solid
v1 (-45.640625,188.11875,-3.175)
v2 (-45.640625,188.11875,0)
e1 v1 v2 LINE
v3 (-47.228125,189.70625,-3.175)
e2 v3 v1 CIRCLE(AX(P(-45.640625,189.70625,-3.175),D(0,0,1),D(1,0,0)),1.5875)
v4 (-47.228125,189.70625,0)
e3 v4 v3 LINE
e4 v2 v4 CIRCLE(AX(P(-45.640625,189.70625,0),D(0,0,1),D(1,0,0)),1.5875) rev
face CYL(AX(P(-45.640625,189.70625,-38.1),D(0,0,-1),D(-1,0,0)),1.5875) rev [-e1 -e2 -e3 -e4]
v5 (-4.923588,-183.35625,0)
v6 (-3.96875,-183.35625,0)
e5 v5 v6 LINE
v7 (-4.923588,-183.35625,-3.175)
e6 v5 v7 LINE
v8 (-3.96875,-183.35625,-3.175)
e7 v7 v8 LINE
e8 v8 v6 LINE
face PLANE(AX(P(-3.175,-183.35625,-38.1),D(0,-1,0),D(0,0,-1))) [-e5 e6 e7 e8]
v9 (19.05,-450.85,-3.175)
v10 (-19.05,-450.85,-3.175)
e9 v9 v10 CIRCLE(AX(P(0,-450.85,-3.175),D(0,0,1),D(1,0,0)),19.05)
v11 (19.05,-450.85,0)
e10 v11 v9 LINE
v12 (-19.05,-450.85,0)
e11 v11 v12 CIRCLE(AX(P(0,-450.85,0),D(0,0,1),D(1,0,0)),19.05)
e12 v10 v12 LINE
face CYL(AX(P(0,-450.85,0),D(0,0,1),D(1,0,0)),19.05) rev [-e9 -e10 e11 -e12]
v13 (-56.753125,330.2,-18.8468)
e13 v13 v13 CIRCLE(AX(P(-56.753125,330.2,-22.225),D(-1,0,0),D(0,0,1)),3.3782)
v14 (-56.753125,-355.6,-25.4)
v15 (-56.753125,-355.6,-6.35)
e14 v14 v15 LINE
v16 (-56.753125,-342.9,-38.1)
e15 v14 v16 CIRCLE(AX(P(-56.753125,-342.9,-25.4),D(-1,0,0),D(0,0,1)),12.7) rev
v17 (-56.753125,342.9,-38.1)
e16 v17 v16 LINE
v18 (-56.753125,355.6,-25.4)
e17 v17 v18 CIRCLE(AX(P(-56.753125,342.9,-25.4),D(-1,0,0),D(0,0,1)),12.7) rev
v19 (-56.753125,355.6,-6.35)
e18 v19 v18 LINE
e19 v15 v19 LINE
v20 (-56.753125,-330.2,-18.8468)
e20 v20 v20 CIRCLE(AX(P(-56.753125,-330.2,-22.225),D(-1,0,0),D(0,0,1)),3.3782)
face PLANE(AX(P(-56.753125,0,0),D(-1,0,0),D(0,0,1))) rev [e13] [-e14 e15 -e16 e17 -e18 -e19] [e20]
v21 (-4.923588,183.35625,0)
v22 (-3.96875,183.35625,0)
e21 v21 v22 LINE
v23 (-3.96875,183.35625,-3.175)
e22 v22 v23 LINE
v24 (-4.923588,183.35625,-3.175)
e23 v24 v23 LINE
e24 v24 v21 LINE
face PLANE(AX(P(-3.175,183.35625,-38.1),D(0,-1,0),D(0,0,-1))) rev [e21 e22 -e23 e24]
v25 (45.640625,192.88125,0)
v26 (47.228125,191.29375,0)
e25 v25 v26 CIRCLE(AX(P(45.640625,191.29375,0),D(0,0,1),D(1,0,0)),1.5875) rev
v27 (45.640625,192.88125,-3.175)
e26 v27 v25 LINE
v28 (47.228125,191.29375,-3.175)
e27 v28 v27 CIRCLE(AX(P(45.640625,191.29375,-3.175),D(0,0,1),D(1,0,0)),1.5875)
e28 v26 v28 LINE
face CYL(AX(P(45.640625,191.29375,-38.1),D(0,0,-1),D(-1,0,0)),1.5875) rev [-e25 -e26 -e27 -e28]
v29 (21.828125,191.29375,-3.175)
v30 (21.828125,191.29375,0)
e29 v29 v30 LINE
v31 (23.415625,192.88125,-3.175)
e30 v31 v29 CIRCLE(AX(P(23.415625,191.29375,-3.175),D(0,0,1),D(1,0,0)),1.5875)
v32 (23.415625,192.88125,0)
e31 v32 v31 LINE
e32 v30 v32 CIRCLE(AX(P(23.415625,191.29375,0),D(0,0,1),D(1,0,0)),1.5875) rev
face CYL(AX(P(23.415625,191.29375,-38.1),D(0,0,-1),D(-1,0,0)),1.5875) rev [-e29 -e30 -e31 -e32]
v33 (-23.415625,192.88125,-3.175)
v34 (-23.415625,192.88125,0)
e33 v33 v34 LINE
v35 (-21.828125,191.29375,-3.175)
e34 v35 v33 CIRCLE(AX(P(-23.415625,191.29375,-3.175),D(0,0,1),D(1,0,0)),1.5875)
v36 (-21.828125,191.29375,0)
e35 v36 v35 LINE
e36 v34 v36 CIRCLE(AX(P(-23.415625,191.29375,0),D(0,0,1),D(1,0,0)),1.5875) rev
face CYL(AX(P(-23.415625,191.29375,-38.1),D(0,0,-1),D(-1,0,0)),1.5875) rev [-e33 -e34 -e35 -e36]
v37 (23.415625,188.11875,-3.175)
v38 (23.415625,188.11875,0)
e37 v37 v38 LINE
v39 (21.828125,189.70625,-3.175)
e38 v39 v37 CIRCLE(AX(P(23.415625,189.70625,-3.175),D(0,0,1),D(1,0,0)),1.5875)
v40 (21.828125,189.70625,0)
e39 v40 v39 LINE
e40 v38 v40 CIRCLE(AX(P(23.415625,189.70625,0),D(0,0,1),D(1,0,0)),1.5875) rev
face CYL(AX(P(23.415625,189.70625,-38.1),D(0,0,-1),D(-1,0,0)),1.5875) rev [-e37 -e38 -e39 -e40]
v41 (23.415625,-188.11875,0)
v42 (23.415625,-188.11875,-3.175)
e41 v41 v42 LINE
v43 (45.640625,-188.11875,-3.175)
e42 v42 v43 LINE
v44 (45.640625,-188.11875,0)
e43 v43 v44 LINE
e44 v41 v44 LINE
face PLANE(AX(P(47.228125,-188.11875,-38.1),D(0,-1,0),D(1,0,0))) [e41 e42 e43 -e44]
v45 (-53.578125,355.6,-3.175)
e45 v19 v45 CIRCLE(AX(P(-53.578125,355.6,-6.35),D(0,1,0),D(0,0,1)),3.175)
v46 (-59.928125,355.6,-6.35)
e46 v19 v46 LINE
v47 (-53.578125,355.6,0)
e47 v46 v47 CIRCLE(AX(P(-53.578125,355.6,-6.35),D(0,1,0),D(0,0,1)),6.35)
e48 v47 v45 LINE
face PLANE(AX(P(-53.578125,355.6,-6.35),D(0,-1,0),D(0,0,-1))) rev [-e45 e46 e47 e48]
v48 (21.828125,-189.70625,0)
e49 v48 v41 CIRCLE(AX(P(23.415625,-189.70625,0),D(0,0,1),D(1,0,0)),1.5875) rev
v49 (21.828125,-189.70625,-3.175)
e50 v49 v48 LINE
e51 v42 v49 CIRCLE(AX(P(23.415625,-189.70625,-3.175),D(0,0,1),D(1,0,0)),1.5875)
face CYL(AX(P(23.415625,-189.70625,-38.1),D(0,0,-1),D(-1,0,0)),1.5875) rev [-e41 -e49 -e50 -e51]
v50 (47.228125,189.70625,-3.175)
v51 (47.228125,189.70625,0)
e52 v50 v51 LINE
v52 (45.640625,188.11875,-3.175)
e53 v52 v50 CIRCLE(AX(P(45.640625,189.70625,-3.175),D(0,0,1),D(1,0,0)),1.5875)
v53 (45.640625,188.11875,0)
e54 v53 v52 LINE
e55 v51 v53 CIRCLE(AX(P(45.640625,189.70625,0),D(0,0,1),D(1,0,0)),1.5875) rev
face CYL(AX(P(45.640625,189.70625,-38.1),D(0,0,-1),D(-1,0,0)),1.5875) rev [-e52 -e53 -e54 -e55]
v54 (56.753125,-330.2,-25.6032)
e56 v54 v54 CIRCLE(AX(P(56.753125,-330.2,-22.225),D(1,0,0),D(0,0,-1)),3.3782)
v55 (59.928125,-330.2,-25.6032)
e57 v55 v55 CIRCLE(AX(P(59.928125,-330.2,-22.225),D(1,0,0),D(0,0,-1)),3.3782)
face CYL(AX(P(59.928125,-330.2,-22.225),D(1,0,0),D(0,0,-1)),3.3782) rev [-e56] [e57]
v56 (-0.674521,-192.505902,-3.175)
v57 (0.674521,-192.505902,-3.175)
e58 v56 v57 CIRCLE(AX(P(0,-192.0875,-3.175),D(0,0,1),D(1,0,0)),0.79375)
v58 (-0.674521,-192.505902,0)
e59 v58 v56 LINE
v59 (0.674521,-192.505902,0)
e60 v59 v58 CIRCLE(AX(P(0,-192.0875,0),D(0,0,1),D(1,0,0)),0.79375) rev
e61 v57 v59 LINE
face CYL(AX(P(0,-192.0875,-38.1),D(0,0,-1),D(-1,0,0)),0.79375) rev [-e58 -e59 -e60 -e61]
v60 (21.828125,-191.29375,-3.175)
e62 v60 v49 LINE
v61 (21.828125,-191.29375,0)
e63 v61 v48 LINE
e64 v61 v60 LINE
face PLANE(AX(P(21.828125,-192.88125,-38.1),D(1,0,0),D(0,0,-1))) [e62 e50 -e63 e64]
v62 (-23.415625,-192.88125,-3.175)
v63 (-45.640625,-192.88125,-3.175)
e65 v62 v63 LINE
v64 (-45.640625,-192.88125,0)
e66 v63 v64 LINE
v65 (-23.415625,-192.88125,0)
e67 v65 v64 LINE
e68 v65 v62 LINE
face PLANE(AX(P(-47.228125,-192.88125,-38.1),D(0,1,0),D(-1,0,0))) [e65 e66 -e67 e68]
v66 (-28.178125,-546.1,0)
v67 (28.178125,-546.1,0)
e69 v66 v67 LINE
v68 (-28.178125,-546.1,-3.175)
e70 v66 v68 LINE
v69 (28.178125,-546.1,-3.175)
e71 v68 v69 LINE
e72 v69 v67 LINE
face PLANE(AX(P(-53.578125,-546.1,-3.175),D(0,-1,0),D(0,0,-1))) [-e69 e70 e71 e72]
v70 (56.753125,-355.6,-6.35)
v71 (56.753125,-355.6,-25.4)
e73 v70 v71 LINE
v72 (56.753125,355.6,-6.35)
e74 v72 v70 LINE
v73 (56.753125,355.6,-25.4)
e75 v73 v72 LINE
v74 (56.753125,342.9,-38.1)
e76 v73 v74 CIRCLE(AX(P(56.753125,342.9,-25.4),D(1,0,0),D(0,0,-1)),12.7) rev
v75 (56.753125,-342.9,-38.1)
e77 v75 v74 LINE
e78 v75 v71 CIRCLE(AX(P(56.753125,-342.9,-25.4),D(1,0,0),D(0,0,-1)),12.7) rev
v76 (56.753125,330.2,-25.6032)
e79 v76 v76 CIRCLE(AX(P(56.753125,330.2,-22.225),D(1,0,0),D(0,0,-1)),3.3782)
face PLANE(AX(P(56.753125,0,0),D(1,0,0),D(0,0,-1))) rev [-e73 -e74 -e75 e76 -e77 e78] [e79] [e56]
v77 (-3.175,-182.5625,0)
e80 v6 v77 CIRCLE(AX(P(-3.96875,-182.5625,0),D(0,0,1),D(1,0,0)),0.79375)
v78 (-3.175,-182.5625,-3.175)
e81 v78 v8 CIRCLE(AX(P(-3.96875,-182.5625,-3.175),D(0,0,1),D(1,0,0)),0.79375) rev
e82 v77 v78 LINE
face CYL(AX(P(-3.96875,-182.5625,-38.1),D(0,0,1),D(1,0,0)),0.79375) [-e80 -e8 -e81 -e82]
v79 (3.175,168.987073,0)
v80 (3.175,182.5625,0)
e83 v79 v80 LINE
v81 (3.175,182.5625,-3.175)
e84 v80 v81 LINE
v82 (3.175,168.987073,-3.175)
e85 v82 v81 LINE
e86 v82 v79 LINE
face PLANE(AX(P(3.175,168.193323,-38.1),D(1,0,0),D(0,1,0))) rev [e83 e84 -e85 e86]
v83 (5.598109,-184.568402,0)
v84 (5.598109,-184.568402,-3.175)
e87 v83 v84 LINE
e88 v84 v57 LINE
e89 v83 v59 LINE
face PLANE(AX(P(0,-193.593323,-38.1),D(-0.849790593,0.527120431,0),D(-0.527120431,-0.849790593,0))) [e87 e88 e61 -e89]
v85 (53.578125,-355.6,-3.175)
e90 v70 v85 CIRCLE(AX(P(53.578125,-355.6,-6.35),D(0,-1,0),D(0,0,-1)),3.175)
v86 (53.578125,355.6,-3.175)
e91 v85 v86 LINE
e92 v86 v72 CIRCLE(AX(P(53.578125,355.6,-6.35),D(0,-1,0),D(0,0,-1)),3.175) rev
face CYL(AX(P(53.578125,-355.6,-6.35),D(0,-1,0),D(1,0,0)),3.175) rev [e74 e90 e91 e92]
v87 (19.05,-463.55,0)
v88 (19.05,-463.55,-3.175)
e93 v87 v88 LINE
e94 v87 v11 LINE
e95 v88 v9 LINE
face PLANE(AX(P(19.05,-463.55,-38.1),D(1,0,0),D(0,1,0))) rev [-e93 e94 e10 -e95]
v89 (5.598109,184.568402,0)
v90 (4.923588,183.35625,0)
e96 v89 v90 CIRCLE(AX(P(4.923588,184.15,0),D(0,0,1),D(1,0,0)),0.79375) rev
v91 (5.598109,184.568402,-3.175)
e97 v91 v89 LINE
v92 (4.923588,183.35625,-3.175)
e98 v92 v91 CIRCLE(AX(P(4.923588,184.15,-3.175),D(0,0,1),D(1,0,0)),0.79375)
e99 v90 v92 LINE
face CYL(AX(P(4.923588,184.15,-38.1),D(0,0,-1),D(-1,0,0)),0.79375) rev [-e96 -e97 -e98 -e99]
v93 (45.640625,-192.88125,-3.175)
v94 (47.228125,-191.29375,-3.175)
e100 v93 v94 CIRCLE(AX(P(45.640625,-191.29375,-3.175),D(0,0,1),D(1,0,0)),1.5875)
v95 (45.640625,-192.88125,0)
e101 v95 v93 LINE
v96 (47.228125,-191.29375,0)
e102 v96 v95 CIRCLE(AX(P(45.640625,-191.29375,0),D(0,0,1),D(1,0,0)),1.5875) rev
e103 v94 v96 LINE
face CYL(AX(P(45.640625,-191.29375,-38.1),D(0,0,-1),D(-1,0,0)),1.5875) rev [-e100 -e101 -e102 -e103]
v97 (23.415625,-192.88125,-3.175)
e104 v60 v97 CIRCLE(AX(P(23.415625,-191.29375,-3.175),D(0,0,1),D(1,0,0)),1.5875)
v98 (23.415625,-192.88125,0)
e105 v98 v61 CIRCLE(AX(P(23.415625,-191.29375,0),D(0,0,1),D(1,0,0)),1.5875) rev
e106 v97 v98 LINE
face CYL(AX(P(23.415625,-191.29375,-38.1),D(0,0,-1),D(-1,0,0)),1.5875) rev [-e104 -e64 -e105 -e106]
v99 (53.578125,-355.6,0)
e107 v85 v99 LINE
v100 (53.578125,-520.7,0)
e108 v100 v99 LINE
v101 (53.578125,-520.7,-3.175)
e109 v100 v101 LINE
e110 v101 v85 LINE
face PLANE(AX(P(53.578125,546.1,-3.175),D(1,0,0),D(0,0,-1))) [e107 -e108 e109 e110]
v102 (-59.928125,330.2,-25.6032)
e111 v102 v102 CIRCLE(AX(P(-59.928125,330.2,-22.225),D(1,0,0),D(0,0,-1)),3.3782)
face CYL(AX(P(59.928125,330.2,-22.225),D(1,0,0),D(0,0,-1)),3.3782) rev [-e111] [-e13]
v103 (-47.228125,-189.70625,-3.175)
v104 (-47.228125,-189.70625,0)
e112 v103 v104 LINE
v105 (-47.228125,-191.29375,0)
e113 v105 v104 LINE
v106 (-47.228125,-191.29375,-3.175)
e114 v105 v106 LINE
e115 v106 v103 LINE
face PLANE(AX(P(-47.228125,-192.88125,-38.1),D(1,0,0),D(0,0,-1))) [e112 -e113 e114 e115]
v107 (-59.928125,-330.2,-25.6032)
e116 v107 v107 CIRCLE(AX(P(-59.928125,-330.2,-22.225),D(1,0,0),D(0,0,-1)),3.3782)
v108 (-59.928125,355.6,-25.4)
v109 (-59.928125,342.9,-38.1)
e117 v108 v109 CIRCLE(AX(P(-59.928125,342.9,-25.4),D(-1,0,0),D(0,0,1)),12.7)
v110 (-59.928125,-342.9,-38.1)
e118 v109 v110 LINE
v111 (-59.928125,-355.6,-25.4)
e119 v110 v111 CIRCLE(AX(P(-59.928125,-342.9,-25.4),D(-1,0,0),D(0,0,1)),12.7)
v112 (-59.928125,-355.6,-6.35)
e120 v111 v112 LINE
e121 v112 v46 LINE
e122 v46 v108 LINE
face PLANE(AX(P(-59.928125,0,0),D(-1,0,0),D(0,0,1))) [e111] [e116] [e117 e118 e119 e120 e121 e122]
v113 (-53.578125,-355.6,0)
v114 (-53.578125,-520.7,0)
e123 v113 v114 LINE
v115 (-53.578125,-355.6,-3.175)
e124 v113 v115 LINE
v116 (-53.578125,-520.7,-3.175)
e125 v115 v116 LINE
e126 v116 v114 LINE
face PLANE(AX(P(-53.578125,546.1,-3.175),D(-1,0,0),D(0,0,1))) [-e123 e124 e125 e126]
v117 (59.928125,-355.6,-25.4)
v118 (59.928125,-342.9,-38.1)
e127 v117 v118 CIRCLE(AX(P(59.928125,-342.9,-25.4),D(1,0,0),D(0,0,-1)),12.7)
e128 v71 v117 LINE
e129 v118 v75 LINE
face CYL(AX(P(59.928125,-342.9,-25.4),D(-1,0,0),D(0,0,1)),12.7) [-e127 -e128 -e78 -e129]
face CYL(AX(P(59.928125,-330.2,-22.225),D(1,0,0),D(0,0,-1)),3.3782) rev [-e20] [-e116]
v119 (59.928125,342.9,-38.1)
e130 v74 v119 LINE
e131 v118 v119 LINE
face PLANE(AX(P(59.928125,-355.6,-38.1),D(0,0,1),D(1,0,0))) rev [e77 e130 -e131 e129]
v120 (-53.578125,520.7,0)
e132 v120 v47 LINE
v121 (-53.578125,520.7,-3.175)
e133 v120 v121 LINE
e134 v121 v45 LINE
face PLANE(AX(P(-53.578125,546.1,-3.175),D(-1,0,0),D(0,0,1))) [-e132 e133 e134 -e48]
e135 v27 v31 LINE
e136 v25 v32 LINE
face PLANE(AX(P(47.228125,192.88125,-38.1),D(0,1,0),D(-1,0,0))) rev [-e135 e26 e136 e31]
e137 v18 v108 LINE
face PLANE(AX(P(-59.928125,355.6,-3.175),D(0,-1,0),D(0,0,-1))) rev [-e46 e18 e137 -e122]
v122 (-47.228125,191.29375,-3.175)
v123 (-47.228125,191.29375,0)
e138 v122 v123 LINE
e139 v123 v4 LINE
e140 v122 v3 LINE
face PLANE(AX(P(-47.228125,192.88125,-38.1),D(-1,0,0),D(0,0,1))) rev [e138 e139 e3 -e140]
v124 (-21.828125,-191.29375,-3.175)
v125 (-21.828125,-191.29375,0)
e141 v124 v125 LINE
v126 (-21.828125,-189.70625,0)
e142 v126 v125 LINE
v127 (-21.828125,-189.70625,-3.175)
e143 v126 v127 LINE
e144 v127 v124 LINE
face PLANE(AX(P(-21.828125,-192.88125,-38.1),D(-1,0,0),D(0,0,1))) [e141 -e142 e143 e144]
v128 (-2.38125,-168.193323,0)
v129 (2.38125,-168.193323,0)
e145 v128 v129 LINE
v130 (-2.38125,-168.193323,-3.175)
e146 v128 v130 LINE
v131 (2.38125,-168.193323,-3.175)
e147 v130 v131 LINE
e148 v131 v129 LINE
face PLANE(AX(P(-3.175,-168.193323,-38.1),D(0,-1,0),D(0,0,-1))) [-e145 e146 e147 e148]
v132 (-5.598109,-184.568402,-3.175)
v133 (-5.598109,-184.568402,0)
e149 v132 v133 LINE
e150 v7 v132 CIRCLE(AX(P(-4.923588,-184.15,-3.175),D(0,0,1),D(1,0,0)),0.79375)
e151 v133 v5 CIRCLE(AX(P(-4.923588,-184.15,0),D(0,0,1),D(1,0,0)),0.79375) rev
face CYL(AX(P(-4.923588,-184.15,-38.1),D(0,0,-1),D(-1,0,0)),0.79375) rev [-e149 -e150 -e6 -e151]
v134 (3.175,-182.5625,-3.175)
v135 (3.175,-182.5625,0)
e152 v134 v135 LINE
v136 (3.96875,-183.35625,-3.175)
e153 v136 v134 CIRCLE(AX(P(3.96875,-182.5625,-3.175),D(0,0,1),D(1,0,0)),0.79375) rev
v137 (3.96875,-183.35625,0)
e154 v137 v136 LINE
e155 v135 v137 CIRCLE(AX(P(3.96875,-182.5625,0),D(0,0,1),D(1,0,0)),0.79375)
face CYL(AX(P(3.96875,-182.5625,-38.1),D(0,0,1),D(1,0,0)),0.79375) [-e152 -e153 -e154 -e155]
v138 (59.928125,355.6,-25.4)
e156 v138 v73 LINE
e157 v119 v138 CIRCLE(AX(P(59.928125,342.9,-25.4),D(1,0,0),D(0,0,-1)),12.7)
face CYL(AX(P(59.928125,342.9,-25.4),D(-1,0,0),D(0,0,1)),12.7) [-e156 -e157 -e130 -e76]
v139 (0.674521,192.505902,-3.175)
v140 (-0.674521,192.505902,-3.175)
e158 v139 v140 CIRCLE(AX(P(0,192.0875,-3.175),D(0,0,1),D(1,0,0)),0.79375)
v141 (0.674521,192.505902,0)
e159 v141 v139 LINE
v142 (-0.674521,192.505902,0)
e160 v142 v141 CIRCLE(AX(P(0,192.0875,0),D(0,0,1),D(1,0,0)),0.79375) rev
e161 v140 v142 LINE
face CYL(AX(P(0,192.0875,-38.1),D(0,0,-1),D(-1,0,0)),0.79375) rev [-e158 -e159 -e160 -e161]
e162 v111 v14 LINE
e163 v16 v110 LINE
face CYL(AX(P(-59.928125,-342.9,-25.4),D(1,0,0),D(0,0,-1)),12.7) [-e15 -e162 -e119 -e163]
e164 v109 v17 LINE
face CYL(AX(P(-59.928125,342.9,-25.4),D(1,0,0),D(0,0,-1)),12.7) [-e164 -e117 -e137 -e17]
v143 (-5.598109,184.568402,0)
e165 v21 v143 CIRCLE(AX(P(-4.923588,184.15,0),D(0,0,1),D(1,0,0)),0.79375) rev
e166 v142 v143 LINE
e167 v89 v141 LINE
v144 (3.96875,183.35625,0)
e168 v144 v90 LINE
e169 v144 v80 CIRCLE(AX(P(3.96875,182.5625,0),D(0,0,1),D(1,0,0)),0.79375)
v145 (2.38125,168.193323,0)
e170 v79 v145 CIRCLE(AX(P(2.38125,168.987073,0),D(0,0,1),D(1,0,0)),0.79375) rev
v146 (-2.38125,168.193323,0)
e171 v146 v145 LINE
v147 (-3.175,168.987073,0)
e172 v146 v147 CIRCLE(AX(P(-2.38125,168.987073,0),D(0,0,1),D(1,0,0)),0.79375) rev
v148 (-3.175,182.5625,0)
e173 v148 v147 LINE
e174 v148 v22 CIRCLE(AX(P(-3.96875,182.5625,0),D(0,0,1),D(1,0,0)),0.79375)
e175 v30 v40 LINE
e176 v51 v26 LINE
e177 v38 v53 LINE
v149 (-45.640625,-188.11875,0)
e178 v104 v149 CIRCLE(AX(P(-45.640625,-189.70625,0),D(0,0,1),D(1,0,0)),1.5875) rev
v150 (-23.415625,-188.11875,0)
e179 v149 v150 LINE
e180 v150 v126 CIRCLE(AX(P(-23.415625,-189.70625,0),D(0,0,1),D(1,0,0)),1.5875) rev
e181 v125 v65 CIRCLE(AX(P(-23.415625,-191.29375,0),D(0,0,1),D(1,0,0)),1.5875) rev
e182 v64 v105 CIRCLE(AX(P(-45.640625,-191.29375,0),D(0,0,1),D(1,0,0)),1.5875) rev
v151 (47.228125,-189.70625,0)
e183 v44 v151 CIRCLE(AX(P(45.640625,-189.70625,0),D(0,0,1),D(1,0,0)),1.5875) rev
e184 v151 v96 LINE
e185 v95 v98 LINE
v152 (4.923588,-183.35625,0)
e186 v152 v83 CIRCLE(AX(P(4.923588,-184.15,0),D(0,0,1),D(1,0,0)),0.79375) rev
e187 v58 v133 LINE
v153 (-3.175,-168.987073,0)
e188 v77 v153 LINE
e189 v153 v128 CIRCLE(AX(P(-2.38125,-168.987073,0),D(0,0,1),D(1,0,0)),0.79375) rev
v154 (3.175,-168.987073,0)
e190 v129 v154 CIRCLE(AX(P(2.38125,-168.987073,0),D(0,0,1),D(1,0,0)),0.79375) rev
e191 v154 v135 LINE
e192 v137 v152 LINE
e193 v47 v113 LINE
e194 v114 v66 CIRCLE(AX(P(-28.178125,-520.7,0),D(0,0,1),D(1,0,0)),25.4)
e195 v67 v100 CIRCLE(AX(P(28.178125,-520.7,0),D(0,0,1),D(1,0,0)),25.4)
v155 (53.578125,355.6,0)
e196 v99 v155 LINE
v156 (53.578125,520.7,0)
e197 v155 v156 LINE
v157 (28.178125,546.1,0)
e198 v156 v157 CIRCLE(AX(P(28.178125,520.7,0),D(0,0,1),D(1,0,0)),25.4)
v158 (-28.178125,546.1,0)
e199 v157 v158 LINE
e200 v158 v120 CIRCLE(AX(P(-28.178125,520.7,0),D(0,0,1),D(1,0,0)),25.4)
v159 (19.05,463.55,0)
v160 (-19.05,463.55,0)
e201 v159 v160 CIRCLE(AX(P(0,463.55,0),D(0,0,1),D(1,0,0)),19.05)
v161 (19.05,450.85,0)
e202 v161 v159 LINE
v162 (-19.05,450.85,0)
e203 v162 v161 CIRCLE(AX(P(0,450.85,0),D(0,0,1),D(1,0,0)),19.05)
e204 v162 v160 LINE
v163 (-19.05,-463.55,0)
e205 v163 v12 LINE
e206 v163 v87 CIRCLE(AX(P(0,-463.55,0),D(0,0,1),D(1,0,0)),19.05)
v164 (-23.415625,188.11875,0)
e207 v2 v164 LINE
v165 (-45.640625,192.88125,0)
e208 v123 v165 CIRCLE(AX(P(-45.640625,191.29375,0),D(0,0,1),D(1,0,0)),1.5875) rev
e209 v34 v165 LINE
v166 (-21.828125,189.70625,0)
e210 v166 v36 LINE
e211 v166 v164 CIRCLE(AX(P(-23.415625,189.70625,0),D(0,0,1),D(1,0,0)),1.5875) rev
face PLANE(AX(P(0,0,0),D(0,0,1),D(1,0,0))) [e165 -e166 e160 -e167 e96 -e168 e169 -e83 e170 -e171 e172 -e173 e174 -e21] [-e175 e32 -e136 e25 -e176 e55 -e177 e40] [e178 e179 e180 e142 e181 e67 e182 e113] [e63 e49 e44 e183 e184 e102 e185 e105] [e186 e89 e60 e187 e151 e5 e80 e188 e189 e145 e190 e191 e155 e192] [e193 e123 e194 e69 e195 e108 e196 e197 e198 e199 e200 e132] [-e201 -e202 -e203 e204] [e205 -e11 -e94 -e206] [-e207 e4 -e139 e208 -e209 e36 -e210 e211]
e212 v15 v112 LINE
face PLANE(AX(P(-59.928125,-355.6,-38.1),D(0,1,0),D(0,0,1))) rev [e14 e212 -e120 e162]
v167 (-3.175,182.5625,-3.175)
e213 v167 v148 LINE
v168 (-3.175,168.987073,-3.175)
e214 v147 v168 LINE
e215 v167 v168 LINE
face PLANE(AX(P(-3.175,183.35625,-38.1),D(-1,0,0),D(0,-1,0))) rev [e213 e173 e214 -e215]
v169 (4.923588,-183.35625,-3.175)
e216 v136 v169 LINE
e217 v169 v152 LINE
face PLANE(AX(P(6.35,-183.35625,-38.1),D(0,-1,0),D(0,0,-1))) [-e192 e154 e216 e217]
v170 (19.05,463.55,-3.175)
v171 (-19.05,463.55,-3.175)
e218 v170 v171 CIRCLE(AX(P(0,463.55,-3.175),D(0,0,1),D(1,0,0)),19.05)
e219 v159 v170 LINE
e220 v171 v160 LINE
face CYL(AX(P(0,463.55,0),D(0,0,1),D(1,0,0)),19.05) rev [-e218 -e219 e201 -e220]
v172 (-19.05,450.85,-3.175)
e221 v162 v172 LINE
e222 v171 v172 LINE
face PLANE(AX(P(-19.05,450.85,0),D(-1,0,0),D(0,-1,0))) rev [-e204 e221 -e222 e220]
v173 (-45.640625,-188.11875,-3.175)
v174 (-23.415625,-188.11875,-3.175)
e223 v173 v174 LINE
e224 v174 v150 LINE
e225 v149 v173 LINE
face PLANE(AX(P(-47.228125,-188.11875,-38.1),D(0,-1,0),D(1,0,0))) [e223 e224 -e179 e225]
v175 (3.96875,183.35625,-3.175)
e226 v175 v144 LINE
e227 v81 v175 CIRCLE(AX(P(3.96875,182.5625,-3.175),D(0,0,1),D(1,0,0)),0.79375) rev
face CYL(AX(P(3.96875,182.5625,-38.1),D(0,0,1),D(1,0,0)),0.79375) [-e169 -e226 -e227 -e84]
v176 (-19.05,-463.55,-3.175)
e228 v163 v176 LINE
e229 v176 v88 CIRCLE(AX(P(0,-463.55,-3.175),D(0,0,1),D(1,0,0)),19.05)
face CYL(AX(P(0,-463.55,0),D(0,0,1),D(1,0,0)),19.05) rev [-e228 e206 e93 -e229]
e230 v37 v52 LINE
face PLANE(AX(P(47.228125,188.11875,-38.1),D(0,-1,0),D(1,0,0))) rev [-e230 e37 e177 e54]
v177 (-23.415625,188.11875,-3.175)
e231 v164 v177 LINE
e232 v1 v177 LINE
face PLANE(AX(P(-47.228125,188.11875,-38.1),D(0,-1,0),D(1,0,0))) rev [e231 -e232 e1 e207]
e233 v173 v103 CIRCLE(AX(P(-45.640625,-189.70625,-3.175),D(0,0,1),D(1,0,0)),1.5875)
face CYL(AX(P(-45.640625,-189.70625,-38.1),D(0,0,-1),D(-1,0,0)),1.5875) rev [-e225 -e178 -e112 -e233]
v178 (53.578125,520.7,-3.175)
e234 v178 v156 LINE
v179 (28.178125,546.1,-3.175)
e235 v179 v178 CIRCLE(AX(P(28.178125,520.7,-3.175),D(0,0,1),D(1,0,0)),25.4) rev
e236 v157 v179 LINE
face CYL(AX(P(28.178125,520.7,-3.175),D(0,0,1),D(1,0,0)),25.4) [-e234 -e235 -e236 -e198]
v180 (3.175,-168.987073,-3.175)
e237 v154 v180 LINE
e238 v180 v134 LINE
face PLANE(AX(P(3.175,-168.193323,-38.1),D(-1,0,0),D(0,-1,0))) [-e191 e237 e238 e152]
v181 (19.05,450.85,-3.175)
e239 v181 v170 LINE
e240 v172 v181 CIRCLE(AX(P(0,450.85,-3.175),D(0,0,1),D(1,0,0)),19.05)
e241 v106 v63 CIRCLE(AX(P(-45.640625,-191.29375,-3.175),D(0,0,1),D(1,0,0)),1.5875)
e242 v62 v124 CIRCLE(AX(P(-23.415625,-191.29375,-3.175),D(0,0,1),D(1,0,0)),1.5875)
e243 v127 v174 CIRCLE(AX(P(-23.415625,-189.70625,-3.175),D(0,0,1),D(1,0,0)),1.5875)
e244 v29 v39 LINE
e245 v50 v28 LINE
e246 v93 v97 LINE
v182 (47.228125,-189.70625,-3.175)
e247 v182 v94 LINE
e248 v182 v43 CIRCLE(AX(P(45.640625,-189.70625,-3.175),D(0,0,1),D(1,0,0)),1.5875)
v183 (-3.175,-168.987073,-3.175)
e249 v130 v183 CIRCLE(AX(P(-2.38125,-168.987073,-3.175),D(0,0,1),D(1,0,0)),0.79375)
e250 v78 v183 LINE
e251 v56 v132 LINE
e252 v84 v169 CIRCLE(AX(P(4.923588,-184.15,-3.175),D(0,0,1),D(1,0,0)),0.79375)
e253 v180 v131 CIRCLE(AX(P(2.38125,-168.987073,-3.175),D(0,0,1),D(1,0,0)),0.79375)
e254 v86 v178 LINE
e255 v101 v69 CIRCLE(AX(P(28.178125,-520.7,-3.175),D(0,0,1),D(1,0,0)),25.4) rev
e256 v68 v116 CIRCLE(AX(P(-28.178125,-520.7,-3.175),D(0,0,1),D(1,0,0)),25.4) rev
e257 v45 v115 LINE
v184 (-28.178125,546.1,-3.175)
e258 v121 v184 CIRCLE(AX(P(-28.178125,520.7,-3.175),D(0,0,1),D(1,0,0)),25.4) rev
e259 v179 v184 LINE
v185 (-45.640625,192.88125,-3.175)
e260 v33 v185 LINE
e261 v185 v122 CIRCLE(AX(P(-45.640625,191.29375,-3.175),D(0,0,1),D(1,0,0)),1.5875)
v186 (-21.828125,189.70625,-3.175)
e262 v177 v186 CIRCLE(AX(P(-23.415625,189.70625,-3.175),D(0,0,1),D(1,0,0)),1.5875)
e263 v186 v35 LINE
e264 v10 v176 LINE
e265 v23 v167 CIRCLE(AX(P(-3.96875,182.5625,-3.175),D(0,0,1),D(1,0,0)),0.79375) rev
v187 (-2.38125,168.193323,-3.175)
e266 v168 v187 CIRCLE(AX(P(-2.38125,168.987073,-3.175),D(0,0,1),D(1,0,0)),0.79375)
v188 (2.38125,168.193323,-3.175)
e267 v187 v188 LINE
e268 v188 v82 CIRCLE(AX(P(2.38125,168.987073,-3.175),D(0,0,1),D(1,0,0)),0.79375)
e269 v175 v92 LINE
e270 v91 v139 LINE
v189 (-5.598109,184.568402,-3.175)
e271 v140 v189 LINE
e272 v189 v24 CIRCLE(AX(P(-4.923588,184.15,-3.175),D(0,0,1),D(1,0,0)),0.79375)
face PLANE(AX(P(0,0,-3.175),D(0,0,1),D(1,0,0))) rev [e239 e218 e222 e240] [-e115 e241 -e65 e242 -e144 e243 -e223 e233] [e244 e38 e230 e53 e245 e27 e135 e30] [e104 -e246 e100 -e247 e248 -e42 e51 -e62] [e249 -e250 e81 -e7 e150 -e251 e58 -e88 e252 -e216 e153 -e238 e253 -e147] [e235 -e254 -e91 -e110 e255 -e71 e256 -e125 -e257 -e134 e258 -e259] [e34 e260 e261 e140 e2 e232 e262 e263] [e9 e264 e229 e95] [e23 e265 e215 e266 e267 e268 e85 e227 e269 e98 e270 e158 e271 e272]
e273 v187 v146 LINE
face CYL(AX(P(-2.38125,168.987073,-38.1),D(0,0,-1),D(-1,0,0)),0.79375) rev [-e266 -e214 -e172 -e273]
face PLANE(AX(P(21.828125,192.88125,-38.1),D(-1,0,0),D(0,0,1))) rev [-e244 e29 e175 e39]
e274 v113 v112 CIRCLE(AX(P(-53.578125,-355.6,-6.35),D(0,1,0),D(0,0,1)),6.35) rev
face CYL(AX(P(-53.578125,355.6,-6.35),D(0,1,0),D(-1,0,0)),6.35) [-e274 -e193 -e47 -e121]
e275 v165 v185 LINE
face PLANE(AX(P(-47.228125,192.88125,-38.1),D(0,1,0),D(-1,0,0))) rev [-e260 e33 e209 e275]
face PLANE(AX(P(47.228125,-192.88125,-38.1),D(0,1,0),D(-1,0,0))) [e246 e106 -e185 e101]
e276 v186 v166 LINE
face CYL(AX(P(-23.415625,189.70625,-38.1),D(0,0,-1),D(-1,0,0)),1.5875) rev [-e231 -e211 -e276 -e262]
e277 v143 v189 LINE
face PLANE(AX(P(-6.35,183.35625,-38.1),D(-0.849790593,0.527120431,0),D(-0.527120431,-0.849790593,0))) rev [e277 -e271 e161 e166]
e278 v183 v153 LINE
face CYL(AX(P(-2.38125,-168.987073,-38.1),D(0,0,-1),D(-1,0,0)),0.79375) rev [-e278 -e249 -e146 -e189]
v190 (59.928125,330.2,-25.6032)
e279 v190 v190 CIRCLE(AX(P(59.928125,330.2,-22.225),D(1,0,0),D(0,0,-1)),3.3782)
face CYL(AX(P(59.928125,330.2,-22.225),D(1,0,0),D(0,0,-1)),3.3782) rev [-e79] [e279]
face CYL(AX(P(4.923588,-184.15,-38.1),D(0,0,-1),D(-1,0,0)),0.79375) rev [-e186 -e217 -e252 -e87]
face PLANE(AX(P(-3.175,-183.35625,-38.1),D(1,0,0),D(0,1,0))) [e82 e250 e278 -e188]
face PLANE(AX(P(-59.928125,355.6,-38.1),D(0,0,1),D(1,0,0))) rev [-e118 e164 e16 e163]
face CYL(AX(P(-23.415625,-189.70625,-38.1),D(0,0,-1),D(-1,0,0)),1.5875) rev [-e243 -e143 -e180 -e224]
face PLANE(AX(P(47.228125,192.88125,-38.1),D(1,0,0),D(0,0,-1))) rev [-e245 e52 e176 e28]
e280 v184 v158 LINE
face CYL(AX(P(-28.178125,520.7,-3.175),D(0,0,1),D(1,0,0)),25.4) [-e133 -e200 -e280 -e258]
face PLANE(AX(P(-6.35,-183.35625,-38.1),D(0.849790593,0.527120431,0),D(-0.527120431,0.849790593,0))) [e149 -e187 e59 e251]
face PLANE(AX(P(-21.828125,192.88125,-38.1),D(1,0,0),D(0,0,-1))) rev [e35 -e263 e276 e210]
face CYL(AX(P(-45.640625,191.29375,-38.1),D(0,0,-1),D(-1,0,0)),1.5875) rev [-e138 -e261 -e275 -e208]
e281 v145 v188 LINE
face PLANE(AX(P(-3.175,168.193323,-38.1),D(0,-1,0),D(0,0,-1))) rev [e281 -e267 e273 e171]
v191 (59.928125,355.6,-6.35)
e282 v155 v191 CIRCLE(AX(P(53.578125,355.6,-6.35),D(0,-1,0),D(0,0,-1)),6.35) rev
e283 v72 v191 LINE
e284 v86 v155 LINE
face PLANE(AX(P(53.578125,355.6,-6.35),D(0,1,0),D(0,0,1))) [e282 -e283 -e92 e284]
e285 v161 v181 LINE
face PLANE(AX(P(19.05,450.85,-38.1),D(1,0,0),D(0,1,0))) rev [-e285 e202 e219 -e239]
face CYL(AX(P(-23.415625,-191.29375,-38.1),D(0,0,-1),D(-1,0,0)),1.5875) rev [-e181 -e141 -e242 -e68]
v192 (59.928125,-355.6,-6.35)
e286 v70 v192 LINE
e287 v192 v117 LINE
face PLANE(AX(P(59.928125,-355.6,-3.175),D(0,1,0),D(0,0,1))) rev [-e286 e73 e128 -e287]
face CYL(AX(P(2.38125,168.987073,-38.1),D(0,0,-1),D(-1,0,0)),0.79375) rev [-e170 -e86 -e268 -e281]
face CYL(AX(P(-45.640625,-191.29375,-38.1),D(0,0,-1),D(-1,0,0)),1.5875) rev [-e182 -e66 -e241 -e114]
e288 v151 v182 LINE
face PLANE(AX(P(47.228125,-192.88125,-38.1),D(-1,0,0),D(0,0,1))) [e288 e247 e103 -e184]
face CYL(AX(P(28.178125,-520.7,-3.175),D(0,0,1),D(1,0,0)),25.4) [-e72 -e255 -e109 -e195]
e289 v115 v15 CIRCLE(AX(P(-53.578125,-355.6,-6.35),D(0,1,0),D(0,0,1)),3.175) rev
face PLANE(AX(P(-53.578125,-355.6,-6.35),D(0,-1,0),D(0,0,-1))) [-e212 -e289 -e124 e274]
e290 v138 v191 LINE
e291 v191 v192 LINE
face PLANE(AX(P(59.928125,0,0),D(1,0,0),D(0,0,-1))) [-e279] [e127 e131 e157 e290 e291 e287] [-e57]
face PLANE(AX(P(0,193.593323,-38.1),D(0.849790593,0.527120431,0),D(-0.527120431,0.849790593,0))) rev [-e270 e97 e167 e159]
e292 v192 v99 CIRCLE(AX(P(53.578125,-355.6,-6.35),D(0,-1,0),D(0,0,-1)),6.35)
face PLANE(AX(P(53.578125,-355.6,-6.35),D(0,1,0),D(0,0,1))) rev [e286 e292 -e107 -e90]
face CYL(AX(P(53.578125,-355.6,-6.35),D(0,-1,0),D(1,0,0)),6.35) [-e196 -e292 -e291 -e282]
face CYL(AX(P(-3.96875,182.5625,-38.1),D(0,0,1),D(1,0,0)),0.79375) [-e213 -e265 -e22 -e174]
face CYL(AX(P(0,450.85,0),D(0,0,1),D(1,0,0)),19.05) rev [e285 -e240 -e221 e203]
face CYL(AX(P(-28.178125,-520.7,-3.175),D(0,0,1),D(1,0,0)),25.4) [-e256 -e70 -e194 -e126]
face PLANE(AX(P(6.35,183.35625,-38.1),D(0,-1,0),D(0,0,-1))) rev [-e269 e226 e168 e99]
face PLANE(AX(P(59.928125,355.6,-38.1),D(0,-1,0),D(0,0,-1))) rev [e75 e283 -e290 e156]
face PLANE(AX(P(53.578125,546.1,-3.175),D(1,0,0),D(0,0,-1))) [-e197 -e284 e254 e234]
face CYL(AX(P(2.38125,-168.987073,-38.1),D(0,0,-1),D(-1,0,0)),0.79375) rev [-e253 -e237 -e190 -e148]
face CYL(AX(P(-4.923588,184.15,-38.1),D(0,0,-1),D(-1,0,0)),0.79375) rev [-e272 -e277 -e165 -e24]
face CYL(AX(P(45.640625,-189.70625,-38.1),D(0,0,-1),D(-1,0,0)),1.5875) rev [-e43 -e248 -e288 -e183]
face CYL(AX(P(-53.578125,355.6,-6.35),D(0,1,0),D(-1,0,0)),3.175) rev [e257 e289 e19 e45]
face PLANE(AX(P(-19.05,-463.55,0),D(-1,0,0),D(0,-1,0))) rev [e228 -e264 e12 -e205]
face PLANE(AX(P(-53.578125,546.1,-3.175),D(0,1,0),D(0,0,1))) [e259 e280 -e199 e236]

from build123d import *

# Parameters (mm, degrees)
SKETCH1_W                 = 107.15625
SKETCH1_H                 = 1092.2
BASE_FLANGE1_DEPTH        = 3.175
EDGE_FLANGE1_DEPTH        = 711.2
EDGE_FLANGE1_BEND_DEPTH   = 711.2
F_1_4_CLEARANCE_HOLE1_D   = 6.7564
FILLET3_R                 = 12.7
FILLET4_R                 = 25.4
F_1_START                 = -3.175
F_1_1_5_DOWEL_SLOT1_DEPTH = 3.175
SKETCH25_W                = 25.4
SKETCH25_H                = 4.7625
CUT_EXTRUDE1_DEPTH        = 551.697920975
FILLET5_R                 = 0.79375
FILLET6_R                 = 1.5875
FILLET5_OF_MIRROR1_R      = 0.79375
FILLET6_OF_MIRROR1_R      = 1.5875


# Read off the part's stored shape, not the designer's step: 1 (1.5) Dowel Slot1
# Sheet-metal steps are written as plain solids
with BuildPart() as part:
    # Sketch1 → Base-Flange1 (new body)
    with BuildSketch(Plane.XY):
        Rectangle(SKETCH1_W, SKETCH1_H)
    extrude(amount=-BASE_FLANGE1_DEPTH)

    # Edge-Flange1 section (across the edge) → Edge-Flange1 (add)
    with BuildSketch(Plane(origin=(56.753125, 355.6, -3.175), x_dir=(-1, 0, 0), z_dir=(0, -1, 0))):
        with BuildLine():
            Line((-3.175, 3.175), (-3.175, 34.925))
            Line((-3.175, 34.925), (0, 34.925))
            Line((0, 34.925), (0, 3.175))
            ThreePointArc((0, 3.175), (0.92993597, 0.92993597), (3.175, 0))
            Line((3.175, 0), (3.175, -3.175))
            ThreePointArc((3.175, -3.175), (-1.315128061, -1.315128061), (-3.175, 3.175))
        make_face()
    extrude(amount=EDGE_FLANGE1_DEPTH)

    # Edge-Flange1 section 2 (across the edge) → Edge-Flange1 bend (add)
    with BuildSketch(Plane(origin=(-56.753125, -355.6, -3.175), x_dir=(1, 0, 0), z_dir=(0, 1, 0))):
        with BuildLine():
            Line((-3.175, 3.175), (-3.175, 34.925))
            Line((-3.175, 34.925), (0, 34.925))
            Line((0, 34.925), (0, 3.175))
            ThreePointArc((0, 3.175), (0.92993597, 0.92993597), (3.175, 0))
            Line((3.175, 0), (3.175, -3.175))
            ThreePointArc((3.175, -3.175), (-1.315128061, -1.315128061), (-3.175, 3.175))
        make_face()
    extrude(amount=EDGE_FLANGE1_BEND_DEPTH)

    # 1/4 Clearance Hole1 (through all)
    with Locations(Plane(origin=(59.928125, 0, 0), x_dir=(0, 0, -1), z_dir=(1, 0, 0))):
        with Locations((22.225, 330.2), (22.225, -330.2)):
            Hole(F_1_4_CLEARANCE_HOLE1_D / 2)

    # Fillet3
    fillet3_edges = [part.edges().sort_by_distance(p)[0] for p in [
        (58.340625, 355.6, -38.1),
        (58.340625, -355.6, -38.1),
        (-58.340625, -355.6, -38.1),
        (-58.340625, 355.6, -38.1),
    ]]
    fillet(fillet3_edges, radius=FILLET3_R)

    # Fillet4
    fillet4_edges = [part.edges().sort_by_distance(p)[0] for p in [
        (53.578125, -546.1, -1.5875),
        (-53.578125, -546.1, -1.5875),
        (-53.578125, 546.1, -1.5875),
        (53.578125, 546.1, -1.5875),
    ]]
    fillet(fillet4_edges, radius=FILLET4_R)

    # 1 (1.5) Dowel Slot1 outline → 1 (1.5) Dowel Slot1 (cut)
    with BuildSketch(Plane.XY.offset(F_1_START)):
        with BuildLine():
            ThreePointArc((-19.05, 450.85), (0, 431.8), (19.05, 450.85))
            Line((19.05, 450.85), (19.05, 463.55))
            ThreePointArc((19.05, 463.55), (0, 482.6), (-19.05, 463.55))
            Line((-19.05, 463.55), (-19.05, 450.85))
        make_face()
        with BuildLine():
            ThreePointArc((-19.05, -463.55), (0, -482.6), (19.05, -463.55))
            Line((19.05, -463.55), (19.05, -450.85))
            ThreePointArc((19.05, -450.85), (0, -431.8), (-19.05, -450.85))
            Line((-19.05, -450.85), (-19.05, -463.55))
        make_face()
    extrude(amount=F_1_1_5_DOWEL_SLOT1_DEPTH, mode=Mode.SUBTRACT)

    # Sketch25 → Cut-Extrude1 (cut, through all)
    with BuildSketch(Plane.XY):
        with Locations((-34.528125, 190.5)):
            Rectangle(SKETCH25_W, SKETCH25_H)
        Polygon((0, 193.59332287), (6.35, 183.35625), (3.175, 183.35625), (3.175, 168.19332287), (-3.175, 168.19332287), (-3.175, 183.35625), (-6.35, 183.35625), align=None)
        with Locations((34.528125, 190.5)):
            Rectangle(SKETCH25_W, SKETCH25_H)
    cut_extrude1 = extrude(amount=-CUT_EXTRUDE1_DEPTH, mode=Mode.SUBTRACT)

    # Fillet5
    fillet5_edges = [part.edges().sort_by_distance(p)[0] for p in [
        (-6.35, 183.35625, -1.5875),
        (0, 193.59332287, -1.5875),
        (6.35, 183.35625, -1.5875),
        (3.175, 183.35625, -1.5875),
        (3.175, 168.19332287, -1.5875),
        (-3.175, 168.19332287, -1.5875),
        (-3.175, 183.35625, -1.5875),
    ]]
    fillet(fillet5_edges, radius=FILLET5_R)

    # Fillet6
    fillet6_edges = [part.edges().sort_by_distance(p)[0] for p in [
        (-47.228125, 188.11875, -1.5875),
        (-47.228125, 192.88125, -1.5875),
        (-21.828125, 192.88125, -1.5875),
        (-21.828125, 188.11875, -1.5875),
        (47.228125, 192.88125, -1.5875),
        (47.228125, 188.11875, -1.5875),
        (21.828125, 188.11875, -1.5875),
        (21.828125, 192.88125, -1.5875),
    ]]
    fillet(fillet6_edges, radius=FILLET6_R)

    # Mirror1: Cut-Extrude1 across plane
    add(cut_extrude1.mirror(Plane.ZX), mode=Mode.SUBTRACT)

    # Fillet5 of Mirror1
    fillet5_of_mirror1_edges = [part.edges().sort_by_distance(p)[0] for p in [
        (-6.35, -183.35625, -1.5875),
        (0, -193.59332287, -1.5875),
        (6.35, -183.35625, -1.5875),
        (3.175, -183.35625, -1.5875),
        (3.175, -168.19332287, -1.5875),
        (-3.175, -168.19332287, -1.5875),
        (-3.175, -183.35625, -1.5875),
    ]]
    fillet(fillet5_of_mirror1_edges, radius=FILLET5_OF_MIRROR1_R)

    # Fillet6 of Mirror1
    fillet6_of_mirror1_edges = [part.edges().sort_by_distance(p)[0] for p in [
        (-47.228125, -188.11875, -1.5875),
        (-47.228125, -192.88125, -1.5875),
        (-21.828125, -192.88125, -1.5875),
        (-21.828125, -188.11875, -1.5875),
        (47.228125, -192.88125, -1.5875),
        (47.228125, -188.11875, -1.5875),
        (21.828125, -188.11875, -1.5875),
        (21.828125, -192.88125, -1.5875),
    ]]
    fillet(fillet6_of_mirror1_edges, radius=FILLET6_OF_MIRROR1_R)


solid = part.part
